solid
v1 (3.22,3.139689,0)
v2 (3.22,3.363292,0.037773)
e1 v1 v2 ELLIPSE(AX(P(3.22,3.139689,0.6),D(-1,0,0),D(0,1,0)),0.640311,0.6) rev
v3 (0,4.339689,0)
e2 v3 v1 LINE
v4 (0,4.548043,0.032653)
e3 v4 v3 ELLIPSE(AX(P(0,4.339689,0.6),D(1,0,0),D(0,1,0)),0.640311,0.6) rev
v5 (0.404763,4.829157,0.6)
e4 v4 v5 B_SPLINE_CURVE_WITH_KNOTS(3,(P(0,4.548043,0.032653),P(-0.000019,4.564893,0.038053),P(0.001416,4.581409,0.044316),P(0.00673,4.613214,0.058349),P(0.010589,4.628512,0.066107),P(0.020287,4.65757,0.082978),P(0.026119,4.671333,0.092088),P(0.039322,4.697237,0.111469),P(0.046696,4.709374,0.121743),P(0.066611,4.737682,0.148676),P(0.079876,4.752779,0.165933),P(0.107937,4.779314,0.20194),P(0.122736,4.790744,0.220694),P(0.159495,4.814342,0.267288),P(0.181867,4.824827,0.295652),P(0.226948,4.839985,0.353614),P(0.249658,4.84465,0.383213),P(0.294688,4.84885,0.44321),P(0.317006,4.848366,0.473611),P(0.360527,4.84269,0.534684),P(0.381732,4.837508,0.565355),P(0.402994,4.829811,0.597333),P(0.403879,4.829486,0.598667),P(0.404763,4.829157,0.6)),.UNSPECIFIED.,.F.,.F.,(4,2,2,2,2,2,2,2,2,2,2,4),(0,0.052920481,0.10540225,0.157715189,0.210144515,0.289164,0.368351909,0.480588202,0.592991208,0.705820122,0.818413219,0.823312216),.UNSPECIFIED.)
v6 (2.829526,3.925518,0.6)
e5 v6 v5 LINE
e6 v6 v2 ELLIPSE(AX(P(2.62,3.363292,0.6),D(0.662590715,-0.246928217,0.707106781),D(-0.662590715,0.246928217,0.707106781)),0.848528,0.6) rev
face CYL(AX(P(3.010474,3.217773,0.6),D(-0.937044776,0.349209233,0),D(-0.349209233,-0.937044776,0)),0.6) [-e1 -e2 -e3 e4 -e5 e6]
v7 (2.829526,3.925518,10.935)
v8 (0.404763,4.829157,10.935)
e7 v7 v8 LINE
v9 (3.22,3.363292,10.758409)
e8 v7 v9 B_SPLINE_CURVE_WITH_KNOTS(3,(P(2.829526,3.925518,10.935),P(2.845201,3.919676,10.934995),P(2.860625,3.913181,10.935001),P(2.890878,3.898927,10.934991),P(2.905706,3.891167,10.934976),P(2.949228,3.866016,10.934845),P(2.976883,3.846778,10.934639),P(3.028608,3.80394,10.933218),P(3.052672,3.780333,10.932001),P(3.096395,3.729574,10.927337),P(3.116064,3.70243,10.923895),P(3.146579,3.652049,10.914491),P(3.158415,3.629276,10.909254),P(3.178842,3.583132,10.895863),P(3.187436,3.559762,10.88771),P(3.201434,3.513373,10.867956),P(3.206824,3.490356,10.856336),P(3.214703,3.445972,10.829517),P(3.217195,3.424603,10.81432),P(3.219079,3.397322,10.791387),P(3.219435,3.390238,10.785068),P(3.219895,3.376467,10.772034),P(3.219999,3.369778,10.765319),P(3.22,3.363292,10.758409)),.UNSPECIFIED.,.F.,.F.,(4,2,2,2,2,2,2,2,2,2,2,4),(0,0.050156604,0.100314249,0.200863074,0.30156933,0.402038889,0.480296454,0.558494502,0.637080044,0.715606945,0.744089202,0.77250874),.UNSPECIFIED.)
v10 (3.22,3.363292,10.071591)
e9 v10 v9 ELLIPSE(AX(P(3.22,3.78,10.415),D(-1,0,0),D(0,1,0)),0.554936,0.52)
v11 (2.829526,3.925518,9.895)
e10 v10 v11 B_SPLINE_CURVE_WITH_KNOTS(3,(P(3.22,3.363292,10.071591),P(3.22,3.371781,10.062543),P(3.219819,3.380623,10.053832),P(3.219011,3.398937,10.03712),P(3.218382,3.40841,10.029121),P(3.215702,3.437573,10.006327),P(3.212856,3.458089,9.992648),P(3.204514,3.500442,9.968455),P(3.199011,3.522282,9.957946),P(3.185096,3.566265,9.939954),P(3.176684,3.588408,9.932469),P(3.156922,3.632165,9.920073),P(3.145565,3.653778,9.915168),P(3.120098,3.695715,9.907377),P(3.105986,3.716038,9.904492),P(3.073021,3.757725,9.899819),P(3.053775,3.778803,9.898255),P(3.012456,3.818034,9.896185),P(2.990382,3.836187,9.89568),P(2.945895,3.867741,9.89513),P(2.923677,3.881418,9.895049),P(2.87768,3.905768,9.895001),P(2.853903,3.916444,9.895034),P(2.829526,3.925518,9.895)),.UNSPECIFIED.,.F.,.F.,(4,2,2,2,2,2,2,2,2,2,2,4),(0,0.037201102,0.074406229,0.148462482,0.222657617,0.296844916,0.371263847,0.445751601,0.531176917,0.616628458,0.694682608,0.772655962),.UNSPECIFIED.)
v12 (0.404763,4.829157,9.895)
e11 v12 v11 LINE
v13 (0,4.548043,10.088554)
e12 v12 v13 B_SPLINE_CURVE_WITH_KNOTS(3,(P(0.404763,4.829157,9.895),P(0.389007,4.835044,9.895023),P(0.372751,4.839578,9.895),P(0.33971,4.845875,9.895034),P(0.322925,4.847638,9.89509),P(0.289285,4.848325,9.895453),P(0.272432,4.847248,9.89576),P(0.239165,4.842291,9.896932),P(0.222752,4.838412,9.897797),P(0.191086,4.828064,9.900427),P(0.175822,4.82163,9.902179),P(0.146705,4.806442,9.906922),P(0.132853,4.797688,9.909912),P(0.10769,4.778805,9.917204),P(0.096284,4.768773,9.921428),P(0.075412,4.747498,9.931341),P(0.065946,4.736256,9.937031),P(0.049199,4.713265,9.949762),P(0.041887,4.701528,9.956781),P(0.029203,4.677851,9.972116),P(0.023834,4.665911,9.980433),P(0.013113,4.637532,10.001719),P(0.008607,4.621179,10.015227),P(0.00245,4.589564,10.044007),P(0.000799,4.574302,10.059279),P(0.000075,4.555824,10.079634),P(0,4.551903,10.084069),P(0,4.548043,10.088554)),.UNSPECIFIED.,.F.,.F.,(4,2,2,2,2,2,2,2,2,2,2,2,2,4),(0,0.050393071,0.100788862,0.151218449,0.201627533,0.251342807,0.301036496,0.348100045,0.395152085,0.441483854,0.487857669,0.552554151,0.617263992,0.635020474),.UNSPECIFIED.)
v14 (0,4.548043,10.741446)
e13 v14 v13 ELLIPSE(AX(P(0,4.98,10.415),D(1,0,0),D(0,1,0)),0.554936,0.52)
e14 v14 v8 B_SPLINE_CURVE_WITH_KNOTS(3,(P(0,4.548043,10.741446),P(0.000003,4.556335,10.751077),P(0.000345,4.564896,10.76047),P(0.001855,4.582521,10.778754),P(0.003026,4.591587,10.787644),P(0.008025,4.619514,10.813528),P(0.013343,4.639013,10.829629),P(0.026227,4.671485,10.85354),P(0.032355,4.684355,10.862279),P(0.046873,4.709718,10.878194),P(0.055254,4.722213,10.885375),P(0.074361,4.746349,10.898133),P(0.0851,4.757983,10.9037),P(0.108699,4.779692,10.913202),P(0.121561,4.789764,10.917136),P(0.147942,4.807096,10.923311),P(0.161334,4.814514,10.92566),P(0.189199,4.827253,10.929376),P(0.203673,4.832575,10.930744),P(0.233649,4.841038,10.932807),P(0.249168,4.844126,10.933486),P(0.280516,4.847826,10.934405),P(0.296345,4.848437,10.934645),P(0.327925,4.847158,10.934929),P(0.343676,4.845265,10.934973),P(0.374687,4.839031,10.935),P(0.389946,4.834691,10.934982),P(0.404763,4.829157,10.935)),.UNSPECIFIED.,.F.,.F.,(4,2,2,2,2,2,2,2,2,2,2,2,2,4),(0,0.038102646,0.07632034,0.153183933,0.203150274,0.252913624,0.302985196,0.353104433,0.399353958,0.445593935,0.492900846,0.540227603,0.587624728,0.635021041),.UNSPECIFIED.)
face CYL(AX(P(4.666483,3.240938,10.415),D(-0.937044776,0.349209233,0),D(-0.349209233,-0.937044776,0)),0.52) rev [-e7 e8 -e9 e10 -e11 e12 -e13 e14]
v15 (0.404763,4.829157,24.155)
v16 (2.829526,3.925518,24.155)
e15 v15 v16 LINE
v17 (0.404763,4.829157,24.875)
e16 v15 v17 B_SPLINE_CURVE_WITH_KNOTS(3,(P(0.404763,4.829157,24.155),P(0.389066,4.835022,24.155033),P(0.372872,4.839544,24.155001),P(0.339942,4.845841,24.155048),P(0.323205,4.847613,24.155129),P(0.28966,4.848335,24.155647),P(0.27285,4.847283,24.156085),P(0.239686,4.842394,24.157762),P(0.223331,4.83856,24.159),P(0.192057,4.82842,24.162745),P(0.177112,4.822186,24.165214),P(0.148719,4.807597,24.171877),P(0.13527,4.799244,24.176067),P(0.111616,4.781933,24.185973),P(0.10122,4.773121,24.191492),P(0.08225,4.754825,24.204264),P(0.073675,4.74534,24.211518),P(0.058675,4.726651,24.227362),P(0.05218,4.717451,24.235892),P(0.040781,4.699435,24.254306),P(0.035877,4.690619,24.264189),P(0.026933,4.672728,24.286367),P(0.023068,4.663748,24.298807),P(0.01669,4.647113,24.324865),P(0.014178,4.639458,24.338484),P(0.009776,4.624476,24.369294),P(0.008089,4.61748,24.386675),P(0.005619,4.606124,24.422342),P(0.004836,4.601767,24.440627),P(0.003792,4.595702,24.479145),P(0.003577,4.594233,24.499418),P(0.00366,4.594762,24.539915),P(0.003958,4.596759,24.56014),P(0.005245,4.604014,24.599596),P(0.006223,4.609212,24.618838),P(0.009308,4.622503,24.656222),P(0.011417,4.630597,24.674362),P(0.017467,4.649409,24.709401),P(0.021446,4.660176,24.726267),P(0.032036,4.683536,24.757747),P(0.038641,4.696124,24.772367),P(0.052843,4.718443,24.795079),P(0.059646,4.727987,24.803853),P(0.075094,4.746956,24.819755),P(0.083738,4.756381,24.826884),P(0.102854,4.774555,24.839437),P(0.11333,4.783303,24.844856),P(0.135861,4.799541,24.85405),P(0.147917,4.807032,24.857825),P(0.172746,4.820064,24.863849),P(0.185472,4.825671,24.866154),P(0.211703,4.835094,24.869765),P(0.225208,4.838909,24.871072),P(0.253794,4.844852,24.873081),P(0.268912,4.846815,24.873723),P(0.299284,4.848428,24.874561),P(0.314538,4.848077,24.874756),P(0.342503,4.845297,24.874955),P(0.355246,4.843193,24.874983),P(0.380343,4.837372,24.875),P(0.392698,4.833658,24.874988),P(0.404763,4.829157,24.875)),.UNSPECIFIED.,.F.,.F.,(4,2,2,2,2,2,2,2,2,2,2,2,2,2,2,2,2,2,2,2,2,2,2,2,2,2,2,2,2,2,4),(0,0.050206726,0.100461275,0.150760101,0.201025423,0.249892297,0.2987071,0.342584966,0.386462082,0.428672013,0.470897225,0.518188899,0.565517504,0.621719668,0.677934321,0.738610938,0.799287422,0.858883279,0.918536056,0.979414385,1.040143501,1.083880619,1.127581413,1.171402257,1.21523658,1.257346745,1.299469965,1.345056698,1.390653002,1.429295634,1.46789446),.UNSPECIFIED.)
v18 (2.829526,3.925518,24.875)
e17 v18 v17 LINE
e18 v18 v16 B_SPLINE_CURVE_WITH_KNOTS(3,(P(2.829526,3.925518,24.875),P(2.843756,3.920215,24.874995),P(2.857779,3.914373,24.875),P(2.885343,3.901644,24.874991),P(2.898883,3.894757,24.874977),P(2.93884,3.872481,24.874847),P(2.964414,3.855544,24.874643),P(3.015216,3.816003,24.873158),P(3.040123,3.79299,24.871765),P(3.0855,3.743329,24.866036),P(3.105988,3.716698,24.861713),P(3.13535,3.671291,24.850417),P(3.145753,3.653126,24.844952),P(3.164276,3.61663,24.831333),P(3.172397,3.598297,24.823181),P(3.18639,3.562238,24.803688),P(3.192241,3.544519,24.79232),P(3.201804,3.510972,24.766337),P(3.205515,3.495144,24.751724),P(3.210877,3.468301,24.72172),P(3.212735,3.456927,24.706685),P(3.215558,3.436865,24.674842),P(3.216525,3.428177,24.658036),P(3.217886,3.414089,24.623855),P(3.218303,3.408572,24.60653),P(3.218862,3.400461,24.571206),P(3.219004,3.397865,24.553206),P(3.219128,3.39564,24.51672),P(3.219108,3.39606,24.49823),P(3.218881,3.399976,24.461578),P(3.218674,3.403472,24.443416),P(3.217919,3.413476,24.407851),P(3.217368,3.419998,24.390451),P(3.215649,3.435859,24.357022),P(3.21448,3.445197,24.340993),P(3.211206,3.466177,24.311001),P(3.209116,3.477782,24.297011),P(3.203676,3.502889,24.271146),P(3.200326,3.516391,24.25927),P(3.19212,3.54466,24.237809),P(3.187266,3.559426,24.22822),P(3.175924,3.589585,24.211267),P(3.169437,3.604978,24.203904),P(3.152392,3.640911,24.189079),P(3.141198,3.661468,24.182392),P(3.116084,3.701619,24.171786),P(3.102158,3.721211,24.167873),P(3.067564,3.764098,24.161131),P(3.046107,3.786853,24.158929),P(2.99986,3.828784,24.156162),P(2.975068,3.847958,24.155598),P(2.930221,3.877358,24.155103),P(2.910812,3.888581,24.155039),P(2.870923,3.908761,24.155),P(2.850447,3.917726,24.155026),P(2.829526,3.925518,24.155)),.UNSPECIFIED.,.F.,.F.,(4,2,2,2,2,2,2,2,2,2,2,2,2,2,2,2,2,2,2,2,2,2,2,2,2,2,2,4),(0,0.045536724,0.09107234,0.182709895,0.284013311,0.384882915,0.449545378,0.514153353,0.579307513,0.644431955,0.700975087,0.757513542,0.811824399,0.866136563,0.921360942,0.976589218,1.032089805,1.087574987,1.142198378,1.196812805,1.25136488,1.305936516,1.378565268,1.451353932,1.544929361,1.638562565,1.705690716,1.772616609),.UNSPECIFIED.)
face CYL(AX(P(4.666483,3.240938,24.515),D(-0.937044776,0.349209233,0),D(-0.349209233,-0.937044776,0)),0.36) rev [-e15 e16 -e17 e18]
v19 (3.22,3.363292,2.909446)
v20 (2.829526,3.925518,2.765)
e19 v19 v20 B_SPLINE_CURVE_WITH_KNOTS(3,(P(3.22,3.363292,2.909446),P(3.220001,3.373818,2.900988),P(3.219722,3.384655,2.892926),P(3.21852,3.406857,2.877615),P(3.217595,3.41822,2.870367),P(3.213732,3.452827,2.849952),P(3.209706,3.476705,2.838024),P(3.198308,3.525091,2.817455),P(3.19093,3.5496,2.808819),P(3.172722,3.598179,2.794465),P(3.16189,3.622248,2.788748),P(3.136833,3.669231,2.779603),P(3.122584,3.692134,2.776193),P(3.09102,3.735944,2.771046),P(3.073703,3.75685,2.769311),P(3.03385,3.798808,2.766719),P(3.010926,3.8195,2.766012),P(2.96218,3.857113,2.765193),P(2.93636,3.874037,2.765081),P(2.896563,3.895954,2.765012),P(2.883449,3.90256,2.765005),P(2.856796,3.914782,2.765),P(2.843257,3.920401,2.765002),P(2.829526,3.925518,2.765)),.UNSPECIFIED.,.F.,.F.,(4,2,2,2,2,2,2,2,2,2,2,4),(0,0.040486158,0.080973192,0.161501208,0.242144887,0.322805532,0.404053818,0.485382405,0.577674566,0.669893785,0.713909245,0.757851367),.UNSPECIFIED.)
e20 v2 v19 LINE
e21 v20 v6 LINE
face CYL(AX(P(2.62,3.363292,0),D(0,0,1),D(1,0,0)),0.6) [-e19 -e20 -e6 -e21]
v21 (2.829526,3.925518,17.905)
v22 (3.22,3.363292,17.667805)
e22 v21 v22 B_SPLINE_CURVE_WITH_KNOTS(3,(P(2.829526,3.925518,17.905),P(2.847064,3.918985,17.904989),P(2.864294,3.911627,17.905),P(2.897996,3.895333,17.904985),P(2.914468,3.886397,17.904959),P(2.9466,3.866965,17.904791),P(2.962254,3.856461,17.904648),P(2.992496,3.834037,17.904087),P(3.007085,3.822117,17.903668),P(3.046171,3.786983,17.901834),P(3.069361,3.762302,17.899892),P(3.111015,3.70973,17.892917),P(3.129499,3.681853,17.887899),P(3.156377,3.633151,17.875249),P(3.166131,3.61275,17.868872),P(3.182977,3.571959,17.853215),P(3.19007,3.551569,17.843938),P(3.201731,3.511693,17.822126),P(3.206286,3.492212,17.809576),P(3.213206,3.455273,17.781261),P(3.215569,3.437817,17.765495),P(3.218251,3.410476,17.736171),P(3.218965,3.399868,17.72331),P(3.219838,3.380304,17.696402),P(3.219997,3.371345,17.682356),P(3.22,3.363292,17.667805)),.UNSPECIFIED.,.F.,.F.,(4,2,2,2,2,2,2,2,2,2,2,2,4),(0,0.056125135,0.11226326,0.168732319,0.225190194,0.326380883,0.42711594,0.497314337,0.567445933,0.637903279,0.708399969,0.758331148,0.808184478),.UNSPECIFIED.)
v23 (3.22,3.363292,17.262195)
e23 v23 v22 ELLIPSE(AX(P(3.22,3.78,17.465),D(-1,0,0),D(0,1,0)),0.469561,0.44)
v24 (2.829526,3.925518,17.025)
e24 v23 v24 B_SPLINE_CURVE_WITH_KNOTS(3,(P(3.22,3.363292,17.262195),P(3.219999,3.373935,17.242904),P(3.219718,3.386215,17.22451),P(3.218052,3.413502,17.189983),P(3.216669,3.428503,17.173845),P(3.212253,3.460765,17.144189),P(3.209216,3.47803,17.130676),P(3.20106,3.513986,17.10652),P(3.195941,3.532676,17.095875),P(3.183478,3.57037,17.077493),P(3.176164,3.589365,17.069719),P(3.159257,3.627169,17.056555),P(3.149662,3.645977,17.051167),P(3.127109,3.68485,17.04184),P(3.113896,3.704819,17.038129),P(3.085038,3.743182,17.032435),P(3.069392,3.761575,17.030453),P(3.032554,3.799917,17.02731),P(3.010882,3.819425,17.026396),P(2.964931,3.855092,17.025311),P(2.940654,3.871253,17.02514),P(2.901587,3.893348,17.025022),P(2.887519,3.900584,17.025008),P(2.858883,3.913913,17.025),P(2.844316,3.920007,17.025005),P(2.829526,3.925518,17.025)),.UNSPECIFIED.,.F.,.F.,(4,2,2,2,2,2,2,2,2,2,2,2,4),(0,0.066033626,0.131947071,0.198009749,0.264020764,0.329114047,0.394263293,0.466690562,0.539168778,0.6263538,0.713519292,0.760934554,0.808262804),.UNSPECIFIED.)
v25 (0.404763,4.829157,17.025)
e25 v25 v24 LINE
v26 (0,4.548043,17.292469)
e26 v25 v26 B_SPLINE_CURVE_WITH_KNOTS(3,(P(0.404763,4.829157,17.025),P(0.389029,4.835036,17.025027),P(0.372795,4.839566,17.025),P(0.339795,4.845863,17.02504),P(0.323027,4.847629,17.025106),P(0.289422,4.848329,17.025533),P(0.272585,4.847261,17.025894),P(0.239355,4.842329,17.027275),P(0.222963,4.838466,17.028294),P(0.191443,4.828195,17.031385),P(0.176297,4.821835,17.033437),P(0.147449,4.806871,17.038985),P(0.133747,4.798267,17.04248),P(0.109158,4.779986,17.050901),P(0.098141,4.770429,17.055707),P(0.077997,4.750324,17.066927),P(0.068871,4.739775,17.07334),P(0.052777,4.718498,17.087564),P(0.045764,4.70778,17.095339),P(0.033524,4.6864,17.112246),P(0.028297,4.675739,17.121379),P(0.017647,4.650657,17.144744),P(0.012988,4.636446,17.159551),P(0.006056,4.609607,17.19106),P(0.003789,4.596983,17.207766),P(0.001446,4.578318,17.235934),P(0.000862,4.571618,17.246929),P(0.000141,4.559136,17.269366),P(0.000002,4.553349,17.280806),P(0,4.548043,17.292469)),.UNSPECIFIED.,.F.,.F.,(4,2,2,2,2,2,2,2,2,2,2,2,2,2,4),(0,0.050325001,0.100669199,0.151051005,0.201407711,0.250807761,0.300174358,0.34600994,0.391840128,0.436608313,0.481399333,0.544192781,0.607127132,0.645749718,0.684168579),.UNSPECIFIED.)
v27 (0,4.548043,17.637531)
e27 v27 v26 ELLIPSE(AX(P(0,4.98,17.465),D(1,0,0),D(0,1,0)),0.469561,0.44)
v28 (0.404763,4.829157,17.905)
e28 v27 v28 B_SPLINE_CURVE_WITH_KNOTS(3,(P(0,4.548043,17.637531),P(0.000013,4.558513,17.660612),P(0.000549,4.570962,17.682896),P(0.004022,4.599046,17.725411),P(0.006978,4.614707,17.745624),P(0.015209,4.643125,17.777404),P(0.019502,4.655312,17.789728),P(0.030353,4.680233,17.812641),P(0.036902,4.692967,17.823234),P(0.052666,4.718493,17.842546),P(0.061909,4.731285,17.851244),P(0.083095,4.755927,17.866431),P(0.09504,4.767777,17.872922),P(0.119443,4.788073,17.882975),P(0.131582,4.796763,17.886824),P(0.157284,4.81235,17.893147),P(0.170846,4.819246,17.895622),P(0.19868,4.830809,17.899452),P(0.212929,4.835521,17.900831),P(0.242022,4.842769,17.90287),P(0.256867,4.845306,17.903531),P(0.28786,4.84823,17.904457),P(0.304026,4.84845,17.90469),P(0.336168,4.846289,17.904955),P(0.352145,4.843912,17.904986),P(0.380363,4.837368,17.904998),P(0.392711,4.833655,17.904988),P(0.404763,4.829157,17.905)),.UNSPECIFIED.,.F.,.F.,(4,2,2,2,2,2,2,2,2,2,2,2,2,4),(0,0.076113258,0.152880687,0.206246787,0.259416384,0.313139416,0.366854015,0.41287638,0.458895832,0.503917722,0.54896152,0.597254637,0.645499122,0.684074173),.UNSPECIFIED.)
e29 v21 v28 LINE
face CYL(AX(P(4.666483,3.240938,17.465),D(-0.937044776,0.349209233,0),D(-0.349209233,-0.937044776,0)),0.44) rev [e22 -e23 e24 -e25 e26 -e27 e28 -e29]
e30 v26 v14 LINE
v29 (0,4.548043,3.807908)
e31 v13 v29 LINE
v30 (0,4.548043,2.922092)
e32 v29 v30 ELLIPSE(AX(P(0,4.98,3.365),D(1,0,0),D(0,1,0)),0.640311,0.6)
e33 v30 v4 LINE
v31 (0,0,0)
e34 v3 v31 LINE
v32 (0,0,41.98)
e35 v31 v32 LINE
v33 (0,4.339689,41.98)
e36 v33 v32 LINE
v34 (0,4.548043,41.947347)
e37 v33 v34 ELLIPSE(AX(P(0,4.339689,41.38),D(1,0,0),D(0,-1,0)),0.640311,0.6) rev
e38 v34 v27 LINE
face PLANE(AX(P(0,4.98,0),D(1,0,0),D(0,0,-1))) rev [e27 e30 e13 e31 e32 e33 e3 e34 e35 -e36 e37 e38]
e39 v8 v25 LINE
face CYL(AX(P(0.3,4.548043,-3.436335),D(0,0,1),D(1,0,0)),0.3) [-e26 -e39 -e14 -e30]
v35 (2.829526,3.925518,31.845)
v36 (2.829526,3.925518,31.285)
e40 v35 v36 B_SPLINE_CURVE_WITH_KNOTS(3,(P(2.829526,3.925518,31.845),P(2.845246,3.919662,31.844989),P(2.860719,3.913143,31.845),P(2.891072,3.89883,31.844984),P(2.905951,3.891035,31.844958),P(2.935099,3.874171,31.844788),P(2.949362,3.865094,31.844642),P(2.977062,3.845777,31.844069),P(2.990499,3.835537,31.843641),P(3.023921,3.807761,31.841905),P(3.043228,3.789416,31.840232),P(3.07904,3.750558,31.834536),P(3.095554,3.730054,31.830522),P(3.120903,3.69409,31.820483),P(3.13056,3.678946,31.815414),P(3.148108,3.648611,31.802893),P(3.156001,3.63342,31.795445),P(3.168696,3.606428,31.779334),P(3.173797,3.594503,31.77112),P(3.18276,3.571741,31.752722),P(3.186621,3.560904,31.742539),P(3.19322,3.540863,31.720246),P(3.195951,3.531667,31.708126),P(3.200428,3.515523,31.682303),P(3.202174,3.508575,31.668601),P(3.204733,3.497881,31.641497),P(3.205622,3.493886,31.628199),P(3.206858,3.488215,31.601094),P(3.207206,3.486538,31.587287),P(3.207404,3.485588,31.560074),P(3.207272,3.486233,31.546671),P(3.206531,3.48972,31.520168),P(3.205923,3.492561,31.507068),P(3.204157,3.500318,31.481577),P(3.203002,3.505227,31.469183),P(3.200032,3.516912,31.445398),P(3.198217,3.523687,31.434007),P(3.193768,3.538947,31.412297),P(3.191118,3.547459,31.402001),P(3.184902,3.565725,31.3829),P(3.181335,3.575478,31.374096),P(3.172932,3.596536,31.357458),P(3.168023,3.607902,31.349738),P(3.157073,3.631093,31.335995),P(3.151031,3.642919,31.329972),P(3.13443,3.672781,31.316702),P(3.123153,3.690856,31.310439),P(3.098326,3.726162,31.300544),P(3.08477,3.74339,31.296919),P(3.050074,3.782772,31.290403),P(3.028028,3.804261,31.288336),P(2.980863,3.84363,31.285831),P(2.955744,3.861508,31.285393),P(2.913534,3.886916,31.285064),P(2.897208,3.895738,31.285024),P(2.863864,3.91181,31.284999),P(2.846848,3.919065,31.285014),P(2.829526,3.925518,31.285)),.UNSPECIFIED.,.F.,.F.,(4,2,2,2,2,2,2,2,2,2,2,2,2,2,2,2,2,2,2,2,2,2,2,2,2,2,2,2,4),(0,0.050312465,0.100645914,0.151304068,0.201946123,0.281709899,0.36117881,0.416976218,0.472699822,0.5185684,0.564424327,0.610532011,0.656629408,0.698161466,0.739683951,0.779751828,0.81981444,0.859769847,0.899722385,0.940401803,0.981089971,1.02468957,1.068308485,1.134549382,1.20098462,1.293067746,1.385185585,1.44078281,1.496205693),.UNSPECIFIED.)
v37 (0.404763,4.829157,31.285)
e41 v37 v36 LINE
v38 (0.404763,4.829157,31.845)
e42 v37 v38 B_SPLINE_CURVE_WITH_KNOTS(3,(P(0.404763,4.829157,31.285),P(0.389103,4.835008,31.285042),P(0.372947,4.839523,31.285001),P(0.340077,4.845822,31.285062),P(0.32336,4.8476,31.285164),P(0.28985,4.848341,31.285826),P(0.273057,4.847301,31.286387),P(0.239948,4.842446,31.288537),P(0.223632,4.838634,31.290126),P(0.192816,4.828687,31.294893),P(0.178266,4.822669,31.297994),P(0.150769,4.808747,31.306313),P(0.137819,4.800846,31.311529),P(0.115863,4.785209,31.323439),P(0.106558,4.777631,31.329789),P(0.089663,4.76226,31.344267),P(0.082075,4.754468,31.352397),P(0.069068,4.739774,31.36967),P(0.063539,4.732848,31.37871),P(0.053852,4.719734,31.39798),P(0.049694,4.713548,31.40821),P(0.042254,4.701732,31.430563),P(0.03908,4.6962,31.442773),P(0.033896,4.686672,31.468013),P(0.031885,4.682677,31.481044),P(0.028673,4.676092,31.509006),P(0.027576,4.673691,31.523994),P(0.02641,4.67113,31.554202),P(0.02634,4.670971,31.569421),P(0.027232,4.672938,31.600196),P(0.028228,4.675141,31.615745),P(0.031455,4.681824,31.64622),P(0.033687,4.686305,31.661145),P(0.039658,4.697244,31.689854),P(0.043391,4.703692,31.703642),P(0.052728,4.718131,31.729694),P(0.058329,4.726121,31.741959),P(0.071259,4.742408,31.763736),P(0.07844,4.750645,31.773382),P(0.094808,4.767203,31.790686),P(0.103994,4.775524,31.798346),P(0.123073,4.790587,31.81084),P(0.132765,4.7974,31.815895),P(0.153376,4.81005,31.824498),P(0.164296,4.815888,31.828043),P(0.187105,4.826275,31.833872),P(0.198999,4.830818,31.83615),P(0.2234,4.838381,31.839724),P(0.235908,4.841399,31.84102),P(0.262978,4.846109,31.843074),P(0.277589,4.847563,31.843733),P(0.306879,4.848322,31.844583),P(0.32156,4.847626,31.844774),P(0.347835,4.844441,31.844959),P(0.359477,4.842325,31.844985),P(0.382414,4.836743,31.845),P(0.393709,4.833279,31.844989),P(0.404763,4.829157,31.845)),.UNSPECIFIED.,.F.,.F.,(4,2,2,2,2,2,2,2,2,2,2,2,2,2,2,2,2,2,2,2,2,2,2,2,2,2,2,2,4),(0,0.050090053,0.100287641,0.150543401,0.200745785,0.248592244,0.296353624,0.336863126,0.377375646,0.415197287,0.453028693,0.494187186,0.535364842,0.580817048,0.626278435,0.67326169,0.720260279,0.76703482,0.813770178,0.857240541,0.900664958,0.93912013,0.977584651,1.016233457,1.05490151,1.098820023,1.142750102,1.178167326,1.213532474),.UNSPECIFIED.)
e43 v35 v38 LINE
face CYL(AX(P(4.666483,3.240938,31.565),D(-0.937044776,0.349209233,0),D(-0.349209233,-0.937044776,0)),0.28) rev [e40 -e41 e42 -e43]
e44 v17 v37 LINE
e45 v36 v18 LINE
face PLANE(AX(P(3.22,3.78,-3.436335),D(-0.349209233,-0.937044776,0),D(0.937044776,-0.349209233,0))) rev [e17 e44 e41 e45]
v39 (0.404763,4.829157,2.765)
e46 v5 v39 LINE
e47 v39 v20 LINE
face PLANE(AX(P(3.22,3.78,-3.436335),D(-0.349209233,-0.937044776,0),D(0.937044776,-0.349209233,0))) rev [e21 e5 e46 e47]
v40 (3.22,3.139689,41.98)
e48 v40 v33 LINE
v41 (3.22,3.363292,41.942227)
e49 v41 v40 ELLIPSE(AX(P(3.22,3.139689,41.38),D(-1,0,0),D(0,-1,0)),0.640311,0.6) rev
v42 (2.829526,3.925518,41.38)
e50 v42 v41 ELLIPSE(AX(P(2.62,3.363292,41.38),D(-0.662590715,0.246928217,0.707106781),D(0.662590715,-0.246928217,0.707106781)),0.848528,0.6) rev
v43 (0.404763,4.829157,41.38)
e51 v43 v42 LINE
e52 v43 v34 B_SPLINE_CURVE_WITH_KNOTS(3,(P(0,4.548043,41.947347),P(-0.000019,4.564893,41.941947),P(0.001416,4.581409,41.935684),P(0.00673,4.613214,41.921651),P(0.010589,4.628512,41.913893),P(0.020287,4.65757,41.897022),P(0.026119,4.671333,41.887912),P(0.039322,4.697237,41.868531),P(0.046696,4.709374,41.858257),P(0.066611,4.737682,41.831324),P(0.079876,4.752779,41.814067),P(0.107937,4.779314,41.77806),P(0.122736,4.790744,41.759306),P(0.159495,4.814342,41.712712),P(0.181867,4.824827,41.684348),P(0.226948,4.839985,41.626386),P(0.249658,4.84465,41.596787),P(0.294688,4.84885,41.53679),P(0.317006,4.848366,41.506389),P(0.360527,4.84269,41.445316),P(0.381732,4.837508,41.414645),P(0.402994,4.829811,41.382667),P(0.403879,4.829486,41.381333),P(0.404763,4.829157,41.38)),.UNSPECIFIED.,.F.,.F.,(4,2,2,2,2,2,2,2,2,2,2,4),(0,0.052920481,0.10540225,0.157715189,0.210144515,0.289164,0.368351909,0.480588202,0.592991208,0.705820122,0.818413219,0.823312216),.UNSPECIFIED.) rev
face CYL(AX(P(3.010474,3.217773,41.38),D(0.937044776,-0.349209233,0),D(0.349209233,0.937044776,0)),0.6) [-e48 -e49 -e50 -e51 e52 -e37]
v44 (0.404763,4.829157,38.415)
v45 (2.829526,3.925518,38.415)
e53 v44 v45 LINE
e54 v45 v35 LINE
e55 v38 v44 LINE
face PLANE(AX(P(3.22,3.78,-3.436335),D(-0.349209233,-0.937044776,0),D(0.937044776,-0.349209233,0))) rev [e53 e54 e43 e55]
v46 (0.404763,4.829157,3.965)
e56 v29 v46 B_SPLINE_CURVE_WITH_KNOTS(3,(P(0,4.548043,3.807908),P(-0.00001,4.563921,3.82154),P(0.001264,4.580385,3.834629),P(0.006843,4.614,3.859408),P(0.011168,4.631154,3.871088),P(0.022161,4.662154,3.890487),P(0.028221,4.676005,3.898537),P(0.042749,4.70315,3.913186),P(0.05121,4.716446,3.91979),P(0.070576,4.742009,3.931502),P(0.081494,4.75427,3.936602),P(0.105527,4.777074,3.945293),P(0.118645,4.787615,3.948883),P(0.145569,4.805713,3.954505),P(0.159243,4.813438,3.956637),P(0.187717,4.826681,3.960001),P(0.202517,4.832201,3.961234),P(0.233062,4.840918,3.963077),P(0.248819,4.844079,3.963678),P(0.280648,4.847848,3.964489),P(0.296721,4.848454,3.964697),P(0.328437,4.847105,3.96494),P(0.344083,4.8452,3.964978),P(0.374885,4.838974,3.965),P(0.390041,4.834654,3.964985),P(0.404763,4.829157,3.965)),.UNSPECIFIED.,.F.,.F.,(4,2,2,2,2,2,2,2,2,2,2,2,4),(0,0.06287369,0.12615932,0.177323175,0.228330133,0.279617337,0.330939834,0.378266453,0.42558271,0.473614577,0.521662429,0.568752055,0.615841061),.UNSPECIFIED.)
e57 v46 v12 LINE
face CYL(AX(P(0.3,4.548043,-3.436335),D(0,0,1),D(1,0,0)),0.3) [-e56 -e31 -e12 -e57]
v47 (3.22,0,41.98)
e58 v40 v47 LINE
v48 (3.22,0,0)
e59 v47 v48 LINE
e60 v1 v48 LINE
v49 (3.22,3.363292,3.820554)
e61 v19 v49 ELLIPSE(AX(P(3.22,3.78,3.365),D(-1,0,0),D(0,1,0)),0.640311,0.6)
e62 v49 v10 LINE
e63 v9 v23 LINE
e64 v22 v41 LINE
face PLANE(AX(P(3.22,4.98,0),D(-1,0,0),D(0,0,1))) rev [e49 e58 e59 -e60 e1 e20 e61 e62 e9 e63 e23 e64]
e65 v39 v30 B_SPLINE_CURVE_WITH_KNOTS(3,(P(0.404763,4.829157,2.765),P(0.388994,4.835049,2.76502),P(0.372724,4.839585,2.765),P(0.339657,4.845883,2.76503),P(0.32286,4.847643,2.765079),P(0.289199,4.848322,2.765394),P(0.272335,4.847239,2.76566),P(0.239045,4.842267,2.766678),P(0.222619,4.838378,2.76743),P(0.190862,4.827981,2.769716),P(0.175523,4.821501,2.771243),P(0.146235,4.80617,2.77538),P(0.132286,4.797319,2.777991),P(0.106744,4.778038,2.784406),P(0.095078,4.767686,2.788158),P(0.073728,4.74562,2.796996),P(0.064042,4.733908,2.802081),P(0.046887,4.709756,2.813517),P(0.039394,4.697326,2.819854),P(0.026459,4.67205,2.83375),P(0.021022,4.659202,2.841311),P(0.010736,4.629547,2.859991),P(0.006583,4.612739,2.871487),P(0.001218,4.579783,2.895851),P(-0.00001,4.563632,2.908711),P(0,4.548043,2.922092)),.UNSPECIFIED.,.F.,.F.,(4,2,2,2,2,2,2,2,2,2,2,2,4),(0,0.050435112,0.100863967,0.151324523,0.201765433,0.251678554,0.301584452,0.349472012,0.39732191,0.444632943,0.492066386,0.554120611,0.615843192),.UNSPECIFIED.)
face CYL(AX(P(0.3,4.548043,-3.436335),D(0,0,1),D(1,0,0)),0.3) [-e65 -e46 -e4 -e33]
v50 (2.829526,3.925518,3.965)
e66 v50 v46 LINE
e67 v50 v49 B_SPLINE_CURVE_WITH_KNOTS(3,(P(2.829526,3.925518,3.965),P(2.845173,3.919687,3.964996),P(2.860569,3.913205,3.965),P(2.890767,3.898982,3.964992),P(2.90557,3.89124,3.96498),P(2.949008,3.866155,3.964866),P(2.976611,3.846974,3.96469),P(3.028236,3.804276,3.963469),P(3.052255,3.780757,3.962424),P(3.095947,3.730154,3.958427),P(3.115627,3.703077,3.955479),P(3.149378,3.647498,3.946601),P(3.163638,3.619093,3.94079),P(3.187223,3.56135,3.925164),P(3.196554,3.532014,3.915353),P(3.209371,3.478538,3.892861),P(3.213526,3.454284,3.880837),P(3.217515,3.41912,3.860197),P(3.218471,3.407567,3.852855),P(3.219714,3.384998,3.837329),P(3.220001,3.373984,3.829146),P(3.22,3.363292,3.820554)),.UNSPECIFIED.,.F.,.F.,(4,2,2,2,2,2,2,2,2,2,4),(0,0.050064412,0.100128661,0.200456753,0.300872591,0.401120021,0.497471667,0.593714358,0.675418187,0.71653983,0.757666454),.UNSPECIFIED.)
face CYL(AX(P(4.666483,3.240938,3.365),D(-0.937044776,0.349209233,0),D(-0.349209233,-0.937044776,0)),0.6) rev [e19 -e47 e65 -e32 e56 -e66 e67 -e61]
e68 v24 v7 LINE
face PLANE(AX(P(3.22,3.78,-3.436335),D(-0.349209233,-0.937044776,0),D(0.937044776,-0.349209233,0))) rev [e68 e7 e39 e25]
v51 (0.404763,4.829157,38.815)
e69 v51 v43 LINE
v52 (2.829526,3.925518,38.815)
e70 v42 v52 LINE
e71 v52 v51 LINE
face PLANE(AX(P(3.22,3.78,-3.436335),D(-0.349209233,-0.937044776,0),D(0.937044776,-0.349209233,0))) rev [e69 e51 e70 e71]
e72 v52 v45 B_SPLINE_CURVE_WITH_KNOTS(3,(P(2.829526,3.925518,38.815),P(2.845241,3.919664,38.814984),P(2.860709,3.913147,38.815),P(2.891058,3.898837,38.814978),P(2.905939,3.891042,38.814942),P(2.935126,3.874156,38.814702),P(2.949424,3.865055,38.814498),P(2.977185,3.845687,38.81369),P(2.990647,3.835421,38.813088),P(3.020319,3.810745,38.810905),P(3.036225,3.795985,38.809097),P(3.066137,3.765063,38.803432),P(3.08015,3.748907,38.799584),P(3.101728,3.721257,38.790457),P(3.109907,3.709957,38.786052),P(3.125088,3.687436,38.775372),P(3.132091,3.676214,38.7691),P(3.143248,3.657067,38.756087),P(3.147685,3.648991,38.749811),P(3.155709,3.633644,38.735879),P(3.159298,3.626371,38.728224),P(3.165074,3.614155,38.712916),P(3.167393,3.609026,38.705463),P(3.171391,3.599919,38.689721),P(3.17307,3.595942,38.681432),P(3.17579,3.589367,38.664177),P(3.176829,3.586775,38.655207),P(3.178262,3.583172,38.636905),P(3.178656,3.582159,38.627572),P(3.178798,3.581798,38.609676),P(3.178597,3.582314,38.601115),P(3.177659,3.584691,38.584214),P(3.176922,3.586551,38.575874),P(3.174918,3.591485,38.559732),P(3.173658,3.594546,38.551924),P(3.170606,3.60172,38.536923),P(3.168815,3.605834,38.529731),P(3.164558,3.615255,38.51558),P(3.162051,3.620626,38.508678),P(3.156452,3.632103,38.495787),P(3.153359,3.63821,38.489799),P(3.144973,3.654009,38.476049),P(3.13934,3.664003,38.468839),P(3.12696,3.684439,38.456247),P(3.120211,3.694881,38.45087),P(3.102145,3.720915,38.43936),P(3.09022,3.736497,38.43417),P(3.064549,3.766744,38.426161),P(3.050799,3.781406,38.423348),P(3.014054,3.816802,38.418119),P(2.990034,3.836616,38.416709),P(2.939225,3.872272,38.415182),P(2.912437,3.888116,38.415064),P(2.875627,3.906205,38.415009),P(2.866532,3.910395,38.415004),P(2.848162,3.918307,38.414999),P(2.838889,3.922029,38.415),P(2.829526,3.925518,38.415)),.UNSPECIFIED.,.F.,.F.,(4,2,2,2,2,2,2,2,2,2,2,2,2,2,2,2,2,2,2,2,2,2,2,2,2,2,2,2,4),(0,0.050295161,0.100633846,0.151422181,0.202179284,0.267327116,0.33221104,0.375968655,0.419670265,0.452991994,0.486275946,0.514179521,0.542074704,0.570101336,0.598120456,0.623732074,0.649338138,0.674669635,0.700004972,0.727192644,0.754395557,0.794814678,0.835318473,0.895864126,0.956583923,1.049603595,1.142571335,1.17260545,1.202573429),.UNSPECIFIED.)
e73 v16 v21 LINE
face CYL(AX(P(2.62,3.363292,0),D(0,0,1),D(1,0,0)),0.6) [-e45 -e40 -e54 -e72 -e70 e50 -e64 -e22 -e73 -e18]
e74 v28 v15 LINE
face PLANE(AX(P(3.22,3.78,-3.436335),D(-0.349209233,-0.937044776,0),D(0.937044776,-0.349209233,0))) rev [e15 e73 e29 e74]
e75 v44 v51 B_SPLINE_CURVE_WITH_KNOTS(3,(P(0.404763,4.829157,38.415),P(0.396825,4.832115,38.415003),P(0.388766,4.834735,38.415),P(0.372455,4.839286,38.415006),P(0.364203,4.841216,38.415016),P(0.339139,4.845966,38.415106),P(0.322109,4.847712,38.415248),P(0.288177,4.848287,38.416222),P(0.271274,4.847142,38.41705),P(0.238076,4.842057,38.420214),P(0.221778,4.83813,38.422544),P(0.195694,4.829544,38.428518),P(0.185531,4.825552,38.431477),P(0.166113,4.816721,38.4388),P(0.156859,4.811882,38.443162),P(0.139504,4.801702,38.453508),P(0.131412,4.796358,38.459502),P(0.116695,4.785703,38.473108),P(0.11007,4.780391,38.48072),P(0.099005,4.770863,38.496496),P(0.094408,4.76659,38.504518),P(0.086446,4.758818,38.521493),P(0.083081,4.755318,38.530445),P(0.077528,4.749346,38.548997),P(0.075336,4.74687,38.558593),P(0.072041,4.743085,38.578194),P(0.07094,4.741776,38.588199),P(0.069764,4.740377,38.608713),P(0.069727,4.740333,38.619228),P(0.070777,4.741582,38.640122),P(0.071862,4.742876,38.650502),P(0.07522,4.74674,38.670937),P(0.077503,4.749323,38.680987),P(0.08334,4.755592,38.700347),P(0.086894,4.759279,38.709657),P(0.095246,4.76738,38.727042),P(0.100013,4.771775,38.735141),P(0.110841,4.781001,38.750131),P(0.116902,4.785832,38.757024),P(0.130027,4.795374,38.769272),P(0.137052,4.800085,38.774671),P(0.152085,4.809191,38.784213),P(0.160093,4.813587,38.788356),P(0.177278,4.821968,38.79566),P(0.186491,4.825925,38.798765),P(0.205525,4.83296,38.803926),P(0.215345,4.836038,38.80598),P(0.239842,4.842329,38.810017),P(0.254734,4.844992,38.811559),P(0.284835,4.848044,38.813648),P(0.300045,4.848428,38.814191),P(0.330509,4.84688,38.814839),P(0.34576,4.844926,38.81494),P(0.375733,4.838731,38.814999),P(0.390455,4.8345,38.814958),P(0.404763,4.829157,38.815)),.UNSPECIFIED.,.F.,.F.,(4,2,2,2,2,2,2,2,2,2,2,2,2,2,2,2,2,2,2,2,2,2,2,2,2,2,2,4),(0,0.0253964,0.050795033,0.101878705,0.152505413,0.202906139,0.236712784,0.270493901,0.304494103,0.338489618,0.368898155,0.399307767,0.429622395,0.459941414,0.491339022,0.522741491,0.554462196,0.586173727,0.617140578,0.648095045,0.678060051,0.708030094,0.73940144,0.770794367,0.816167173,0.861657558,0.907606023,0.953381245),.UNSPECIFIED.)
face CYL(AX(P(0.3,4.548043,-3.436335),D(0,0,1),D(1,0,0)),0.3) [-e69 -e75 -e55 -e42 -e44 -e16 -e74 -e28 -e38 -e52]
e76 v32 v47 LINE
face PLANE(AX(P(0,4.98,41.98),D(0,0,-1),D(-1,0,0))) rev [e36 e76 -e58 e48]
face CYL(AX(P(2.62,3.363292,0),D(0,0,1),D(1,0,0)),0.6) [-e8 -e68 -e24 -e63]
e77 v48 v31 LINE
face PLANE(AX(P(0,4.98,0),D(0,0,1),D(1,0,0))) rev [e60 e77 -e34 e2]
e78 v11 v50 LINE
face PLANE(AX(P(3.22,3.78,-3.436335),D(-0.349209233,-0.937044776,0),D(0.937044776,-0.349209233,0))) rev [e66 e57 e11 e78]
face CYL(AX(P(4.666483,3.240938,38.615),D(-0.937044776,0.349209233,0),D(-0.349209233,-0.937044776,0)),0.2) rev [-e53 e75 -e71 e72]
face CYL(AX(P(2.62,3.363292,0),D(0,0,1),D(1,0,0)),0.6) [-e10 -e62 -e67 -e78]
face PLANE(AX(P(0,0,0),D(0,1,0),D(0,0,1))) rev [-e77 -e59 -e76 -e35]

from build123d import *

# Parameters (mm, degrees)
SKETCH1_W           = 3.22
SKETCH1_H           = 41.98
BOSS_EXTRUDE1_DEPTH = 4.98
CUT_EXTRUDE1_DEPTH  = 41.98
FILLET1_R           = 0.6
FILLET2_R           = 0.3
SKETCH4_R           = 0.6
SKETCH4_R_2         = 0.2
SKETCH4_R_3         = 0.28
SKETCH4_R_4         = 0.36
SKETCH4_R_5         = 0.44
SKETCH4_R_6         = 0.52
CUT_EXTRUDE2_DEPTH  = 4.98


with BuildPart() as part:
    # Sketch1 → Boss-Extrude1 (new body)
    with BuildSketch(Plane(origin=(0, 0, 0), x_dir=(1, 0, 0), z_dir=(0, 1, 0))):
        with Locations((1.61, -20.99)):
            Rectangle(SKETCH1_W, SKETCH1_H)
    extrude(amount=BOSS_EXTRUDE1_DEPTH)

    # Sketch2 → Cut-Extrude1 (cut)
    with BuildSketch(Plane.XY.offset(41.98)):
        Polygon((0, 4.98), (3.22, 4.98), (3.22, 3.78), align=None)
    extrude(amount=-CUT_EXTRUDE1_DEPTH, mode=Mode.SUBTRACT)

    # Fillet1
    fillet1_edges = [part.edges().sort_by_distance(p)[0] for p in [
        (3.22, 3.78, 20.99),
        (1.61, 4.38, 41.98),
        (1.61, 4.38, 0),
    ]]
    fillet(fillet1_edges, radius=FILLET1_R)

    # Fillet2
    # the kernel refuses this fillet: 0.3 mm, written as the material it takes off along each edge
    with BuildSketch(Plane(origin=(0, 4.98, 42.459891752), x_dir=(0, -1, 0), z_dir=(0, 0, -1))) as fillet2_piece_1:
        with BuildLine():
            CenterArc((FILLET2_R * 1.43985566994, -FILLET2_R), FILLET2_R, 90, 110.438955915)
            Line((FILLET2_R * 0.50281089434, -FILLET2_R * 1.34920923314), (0, 0))
            Line((0, 0), (FILLET2_R * 1.43985566994, 0))
        make_face()
    extrude(amount=42.939783505, mode=Mode.SUBTRACT)

    # Sketch4 → Cut-Extrude2 (cut)
    with BuildSketch(Plane(origin=(-1.629578944, 0.607296501, 0), x_dir=(0, 0, 1), z_dir=(-0.9370447756039936, 0.3492092331443447, 0))):
        with Locations((3.365, 4.666482983)):
            Circle(SKETCH4_R)
        with Locations((38.615, 4.666482983)):
            Circle(SKETCH4_R_2)
        with Locations((31.565, 4.666482983)):
            Circle(SKETCH4_R_3)
        with Locations((24.515, 4.666482983)):
            Circle(SKETCH4_R_4)
        with Locations((17.465, 4.666482983)):
            Circle(SKETCH4_R_5)
        with Locations((10.415, 4.666482983)):
            Circle(SKETCH4_R_6)
    extrude(amount=-CUT_EXTRUDE2_DEPTH, mode=Mode.SUBTRACT)


solid = part.part
